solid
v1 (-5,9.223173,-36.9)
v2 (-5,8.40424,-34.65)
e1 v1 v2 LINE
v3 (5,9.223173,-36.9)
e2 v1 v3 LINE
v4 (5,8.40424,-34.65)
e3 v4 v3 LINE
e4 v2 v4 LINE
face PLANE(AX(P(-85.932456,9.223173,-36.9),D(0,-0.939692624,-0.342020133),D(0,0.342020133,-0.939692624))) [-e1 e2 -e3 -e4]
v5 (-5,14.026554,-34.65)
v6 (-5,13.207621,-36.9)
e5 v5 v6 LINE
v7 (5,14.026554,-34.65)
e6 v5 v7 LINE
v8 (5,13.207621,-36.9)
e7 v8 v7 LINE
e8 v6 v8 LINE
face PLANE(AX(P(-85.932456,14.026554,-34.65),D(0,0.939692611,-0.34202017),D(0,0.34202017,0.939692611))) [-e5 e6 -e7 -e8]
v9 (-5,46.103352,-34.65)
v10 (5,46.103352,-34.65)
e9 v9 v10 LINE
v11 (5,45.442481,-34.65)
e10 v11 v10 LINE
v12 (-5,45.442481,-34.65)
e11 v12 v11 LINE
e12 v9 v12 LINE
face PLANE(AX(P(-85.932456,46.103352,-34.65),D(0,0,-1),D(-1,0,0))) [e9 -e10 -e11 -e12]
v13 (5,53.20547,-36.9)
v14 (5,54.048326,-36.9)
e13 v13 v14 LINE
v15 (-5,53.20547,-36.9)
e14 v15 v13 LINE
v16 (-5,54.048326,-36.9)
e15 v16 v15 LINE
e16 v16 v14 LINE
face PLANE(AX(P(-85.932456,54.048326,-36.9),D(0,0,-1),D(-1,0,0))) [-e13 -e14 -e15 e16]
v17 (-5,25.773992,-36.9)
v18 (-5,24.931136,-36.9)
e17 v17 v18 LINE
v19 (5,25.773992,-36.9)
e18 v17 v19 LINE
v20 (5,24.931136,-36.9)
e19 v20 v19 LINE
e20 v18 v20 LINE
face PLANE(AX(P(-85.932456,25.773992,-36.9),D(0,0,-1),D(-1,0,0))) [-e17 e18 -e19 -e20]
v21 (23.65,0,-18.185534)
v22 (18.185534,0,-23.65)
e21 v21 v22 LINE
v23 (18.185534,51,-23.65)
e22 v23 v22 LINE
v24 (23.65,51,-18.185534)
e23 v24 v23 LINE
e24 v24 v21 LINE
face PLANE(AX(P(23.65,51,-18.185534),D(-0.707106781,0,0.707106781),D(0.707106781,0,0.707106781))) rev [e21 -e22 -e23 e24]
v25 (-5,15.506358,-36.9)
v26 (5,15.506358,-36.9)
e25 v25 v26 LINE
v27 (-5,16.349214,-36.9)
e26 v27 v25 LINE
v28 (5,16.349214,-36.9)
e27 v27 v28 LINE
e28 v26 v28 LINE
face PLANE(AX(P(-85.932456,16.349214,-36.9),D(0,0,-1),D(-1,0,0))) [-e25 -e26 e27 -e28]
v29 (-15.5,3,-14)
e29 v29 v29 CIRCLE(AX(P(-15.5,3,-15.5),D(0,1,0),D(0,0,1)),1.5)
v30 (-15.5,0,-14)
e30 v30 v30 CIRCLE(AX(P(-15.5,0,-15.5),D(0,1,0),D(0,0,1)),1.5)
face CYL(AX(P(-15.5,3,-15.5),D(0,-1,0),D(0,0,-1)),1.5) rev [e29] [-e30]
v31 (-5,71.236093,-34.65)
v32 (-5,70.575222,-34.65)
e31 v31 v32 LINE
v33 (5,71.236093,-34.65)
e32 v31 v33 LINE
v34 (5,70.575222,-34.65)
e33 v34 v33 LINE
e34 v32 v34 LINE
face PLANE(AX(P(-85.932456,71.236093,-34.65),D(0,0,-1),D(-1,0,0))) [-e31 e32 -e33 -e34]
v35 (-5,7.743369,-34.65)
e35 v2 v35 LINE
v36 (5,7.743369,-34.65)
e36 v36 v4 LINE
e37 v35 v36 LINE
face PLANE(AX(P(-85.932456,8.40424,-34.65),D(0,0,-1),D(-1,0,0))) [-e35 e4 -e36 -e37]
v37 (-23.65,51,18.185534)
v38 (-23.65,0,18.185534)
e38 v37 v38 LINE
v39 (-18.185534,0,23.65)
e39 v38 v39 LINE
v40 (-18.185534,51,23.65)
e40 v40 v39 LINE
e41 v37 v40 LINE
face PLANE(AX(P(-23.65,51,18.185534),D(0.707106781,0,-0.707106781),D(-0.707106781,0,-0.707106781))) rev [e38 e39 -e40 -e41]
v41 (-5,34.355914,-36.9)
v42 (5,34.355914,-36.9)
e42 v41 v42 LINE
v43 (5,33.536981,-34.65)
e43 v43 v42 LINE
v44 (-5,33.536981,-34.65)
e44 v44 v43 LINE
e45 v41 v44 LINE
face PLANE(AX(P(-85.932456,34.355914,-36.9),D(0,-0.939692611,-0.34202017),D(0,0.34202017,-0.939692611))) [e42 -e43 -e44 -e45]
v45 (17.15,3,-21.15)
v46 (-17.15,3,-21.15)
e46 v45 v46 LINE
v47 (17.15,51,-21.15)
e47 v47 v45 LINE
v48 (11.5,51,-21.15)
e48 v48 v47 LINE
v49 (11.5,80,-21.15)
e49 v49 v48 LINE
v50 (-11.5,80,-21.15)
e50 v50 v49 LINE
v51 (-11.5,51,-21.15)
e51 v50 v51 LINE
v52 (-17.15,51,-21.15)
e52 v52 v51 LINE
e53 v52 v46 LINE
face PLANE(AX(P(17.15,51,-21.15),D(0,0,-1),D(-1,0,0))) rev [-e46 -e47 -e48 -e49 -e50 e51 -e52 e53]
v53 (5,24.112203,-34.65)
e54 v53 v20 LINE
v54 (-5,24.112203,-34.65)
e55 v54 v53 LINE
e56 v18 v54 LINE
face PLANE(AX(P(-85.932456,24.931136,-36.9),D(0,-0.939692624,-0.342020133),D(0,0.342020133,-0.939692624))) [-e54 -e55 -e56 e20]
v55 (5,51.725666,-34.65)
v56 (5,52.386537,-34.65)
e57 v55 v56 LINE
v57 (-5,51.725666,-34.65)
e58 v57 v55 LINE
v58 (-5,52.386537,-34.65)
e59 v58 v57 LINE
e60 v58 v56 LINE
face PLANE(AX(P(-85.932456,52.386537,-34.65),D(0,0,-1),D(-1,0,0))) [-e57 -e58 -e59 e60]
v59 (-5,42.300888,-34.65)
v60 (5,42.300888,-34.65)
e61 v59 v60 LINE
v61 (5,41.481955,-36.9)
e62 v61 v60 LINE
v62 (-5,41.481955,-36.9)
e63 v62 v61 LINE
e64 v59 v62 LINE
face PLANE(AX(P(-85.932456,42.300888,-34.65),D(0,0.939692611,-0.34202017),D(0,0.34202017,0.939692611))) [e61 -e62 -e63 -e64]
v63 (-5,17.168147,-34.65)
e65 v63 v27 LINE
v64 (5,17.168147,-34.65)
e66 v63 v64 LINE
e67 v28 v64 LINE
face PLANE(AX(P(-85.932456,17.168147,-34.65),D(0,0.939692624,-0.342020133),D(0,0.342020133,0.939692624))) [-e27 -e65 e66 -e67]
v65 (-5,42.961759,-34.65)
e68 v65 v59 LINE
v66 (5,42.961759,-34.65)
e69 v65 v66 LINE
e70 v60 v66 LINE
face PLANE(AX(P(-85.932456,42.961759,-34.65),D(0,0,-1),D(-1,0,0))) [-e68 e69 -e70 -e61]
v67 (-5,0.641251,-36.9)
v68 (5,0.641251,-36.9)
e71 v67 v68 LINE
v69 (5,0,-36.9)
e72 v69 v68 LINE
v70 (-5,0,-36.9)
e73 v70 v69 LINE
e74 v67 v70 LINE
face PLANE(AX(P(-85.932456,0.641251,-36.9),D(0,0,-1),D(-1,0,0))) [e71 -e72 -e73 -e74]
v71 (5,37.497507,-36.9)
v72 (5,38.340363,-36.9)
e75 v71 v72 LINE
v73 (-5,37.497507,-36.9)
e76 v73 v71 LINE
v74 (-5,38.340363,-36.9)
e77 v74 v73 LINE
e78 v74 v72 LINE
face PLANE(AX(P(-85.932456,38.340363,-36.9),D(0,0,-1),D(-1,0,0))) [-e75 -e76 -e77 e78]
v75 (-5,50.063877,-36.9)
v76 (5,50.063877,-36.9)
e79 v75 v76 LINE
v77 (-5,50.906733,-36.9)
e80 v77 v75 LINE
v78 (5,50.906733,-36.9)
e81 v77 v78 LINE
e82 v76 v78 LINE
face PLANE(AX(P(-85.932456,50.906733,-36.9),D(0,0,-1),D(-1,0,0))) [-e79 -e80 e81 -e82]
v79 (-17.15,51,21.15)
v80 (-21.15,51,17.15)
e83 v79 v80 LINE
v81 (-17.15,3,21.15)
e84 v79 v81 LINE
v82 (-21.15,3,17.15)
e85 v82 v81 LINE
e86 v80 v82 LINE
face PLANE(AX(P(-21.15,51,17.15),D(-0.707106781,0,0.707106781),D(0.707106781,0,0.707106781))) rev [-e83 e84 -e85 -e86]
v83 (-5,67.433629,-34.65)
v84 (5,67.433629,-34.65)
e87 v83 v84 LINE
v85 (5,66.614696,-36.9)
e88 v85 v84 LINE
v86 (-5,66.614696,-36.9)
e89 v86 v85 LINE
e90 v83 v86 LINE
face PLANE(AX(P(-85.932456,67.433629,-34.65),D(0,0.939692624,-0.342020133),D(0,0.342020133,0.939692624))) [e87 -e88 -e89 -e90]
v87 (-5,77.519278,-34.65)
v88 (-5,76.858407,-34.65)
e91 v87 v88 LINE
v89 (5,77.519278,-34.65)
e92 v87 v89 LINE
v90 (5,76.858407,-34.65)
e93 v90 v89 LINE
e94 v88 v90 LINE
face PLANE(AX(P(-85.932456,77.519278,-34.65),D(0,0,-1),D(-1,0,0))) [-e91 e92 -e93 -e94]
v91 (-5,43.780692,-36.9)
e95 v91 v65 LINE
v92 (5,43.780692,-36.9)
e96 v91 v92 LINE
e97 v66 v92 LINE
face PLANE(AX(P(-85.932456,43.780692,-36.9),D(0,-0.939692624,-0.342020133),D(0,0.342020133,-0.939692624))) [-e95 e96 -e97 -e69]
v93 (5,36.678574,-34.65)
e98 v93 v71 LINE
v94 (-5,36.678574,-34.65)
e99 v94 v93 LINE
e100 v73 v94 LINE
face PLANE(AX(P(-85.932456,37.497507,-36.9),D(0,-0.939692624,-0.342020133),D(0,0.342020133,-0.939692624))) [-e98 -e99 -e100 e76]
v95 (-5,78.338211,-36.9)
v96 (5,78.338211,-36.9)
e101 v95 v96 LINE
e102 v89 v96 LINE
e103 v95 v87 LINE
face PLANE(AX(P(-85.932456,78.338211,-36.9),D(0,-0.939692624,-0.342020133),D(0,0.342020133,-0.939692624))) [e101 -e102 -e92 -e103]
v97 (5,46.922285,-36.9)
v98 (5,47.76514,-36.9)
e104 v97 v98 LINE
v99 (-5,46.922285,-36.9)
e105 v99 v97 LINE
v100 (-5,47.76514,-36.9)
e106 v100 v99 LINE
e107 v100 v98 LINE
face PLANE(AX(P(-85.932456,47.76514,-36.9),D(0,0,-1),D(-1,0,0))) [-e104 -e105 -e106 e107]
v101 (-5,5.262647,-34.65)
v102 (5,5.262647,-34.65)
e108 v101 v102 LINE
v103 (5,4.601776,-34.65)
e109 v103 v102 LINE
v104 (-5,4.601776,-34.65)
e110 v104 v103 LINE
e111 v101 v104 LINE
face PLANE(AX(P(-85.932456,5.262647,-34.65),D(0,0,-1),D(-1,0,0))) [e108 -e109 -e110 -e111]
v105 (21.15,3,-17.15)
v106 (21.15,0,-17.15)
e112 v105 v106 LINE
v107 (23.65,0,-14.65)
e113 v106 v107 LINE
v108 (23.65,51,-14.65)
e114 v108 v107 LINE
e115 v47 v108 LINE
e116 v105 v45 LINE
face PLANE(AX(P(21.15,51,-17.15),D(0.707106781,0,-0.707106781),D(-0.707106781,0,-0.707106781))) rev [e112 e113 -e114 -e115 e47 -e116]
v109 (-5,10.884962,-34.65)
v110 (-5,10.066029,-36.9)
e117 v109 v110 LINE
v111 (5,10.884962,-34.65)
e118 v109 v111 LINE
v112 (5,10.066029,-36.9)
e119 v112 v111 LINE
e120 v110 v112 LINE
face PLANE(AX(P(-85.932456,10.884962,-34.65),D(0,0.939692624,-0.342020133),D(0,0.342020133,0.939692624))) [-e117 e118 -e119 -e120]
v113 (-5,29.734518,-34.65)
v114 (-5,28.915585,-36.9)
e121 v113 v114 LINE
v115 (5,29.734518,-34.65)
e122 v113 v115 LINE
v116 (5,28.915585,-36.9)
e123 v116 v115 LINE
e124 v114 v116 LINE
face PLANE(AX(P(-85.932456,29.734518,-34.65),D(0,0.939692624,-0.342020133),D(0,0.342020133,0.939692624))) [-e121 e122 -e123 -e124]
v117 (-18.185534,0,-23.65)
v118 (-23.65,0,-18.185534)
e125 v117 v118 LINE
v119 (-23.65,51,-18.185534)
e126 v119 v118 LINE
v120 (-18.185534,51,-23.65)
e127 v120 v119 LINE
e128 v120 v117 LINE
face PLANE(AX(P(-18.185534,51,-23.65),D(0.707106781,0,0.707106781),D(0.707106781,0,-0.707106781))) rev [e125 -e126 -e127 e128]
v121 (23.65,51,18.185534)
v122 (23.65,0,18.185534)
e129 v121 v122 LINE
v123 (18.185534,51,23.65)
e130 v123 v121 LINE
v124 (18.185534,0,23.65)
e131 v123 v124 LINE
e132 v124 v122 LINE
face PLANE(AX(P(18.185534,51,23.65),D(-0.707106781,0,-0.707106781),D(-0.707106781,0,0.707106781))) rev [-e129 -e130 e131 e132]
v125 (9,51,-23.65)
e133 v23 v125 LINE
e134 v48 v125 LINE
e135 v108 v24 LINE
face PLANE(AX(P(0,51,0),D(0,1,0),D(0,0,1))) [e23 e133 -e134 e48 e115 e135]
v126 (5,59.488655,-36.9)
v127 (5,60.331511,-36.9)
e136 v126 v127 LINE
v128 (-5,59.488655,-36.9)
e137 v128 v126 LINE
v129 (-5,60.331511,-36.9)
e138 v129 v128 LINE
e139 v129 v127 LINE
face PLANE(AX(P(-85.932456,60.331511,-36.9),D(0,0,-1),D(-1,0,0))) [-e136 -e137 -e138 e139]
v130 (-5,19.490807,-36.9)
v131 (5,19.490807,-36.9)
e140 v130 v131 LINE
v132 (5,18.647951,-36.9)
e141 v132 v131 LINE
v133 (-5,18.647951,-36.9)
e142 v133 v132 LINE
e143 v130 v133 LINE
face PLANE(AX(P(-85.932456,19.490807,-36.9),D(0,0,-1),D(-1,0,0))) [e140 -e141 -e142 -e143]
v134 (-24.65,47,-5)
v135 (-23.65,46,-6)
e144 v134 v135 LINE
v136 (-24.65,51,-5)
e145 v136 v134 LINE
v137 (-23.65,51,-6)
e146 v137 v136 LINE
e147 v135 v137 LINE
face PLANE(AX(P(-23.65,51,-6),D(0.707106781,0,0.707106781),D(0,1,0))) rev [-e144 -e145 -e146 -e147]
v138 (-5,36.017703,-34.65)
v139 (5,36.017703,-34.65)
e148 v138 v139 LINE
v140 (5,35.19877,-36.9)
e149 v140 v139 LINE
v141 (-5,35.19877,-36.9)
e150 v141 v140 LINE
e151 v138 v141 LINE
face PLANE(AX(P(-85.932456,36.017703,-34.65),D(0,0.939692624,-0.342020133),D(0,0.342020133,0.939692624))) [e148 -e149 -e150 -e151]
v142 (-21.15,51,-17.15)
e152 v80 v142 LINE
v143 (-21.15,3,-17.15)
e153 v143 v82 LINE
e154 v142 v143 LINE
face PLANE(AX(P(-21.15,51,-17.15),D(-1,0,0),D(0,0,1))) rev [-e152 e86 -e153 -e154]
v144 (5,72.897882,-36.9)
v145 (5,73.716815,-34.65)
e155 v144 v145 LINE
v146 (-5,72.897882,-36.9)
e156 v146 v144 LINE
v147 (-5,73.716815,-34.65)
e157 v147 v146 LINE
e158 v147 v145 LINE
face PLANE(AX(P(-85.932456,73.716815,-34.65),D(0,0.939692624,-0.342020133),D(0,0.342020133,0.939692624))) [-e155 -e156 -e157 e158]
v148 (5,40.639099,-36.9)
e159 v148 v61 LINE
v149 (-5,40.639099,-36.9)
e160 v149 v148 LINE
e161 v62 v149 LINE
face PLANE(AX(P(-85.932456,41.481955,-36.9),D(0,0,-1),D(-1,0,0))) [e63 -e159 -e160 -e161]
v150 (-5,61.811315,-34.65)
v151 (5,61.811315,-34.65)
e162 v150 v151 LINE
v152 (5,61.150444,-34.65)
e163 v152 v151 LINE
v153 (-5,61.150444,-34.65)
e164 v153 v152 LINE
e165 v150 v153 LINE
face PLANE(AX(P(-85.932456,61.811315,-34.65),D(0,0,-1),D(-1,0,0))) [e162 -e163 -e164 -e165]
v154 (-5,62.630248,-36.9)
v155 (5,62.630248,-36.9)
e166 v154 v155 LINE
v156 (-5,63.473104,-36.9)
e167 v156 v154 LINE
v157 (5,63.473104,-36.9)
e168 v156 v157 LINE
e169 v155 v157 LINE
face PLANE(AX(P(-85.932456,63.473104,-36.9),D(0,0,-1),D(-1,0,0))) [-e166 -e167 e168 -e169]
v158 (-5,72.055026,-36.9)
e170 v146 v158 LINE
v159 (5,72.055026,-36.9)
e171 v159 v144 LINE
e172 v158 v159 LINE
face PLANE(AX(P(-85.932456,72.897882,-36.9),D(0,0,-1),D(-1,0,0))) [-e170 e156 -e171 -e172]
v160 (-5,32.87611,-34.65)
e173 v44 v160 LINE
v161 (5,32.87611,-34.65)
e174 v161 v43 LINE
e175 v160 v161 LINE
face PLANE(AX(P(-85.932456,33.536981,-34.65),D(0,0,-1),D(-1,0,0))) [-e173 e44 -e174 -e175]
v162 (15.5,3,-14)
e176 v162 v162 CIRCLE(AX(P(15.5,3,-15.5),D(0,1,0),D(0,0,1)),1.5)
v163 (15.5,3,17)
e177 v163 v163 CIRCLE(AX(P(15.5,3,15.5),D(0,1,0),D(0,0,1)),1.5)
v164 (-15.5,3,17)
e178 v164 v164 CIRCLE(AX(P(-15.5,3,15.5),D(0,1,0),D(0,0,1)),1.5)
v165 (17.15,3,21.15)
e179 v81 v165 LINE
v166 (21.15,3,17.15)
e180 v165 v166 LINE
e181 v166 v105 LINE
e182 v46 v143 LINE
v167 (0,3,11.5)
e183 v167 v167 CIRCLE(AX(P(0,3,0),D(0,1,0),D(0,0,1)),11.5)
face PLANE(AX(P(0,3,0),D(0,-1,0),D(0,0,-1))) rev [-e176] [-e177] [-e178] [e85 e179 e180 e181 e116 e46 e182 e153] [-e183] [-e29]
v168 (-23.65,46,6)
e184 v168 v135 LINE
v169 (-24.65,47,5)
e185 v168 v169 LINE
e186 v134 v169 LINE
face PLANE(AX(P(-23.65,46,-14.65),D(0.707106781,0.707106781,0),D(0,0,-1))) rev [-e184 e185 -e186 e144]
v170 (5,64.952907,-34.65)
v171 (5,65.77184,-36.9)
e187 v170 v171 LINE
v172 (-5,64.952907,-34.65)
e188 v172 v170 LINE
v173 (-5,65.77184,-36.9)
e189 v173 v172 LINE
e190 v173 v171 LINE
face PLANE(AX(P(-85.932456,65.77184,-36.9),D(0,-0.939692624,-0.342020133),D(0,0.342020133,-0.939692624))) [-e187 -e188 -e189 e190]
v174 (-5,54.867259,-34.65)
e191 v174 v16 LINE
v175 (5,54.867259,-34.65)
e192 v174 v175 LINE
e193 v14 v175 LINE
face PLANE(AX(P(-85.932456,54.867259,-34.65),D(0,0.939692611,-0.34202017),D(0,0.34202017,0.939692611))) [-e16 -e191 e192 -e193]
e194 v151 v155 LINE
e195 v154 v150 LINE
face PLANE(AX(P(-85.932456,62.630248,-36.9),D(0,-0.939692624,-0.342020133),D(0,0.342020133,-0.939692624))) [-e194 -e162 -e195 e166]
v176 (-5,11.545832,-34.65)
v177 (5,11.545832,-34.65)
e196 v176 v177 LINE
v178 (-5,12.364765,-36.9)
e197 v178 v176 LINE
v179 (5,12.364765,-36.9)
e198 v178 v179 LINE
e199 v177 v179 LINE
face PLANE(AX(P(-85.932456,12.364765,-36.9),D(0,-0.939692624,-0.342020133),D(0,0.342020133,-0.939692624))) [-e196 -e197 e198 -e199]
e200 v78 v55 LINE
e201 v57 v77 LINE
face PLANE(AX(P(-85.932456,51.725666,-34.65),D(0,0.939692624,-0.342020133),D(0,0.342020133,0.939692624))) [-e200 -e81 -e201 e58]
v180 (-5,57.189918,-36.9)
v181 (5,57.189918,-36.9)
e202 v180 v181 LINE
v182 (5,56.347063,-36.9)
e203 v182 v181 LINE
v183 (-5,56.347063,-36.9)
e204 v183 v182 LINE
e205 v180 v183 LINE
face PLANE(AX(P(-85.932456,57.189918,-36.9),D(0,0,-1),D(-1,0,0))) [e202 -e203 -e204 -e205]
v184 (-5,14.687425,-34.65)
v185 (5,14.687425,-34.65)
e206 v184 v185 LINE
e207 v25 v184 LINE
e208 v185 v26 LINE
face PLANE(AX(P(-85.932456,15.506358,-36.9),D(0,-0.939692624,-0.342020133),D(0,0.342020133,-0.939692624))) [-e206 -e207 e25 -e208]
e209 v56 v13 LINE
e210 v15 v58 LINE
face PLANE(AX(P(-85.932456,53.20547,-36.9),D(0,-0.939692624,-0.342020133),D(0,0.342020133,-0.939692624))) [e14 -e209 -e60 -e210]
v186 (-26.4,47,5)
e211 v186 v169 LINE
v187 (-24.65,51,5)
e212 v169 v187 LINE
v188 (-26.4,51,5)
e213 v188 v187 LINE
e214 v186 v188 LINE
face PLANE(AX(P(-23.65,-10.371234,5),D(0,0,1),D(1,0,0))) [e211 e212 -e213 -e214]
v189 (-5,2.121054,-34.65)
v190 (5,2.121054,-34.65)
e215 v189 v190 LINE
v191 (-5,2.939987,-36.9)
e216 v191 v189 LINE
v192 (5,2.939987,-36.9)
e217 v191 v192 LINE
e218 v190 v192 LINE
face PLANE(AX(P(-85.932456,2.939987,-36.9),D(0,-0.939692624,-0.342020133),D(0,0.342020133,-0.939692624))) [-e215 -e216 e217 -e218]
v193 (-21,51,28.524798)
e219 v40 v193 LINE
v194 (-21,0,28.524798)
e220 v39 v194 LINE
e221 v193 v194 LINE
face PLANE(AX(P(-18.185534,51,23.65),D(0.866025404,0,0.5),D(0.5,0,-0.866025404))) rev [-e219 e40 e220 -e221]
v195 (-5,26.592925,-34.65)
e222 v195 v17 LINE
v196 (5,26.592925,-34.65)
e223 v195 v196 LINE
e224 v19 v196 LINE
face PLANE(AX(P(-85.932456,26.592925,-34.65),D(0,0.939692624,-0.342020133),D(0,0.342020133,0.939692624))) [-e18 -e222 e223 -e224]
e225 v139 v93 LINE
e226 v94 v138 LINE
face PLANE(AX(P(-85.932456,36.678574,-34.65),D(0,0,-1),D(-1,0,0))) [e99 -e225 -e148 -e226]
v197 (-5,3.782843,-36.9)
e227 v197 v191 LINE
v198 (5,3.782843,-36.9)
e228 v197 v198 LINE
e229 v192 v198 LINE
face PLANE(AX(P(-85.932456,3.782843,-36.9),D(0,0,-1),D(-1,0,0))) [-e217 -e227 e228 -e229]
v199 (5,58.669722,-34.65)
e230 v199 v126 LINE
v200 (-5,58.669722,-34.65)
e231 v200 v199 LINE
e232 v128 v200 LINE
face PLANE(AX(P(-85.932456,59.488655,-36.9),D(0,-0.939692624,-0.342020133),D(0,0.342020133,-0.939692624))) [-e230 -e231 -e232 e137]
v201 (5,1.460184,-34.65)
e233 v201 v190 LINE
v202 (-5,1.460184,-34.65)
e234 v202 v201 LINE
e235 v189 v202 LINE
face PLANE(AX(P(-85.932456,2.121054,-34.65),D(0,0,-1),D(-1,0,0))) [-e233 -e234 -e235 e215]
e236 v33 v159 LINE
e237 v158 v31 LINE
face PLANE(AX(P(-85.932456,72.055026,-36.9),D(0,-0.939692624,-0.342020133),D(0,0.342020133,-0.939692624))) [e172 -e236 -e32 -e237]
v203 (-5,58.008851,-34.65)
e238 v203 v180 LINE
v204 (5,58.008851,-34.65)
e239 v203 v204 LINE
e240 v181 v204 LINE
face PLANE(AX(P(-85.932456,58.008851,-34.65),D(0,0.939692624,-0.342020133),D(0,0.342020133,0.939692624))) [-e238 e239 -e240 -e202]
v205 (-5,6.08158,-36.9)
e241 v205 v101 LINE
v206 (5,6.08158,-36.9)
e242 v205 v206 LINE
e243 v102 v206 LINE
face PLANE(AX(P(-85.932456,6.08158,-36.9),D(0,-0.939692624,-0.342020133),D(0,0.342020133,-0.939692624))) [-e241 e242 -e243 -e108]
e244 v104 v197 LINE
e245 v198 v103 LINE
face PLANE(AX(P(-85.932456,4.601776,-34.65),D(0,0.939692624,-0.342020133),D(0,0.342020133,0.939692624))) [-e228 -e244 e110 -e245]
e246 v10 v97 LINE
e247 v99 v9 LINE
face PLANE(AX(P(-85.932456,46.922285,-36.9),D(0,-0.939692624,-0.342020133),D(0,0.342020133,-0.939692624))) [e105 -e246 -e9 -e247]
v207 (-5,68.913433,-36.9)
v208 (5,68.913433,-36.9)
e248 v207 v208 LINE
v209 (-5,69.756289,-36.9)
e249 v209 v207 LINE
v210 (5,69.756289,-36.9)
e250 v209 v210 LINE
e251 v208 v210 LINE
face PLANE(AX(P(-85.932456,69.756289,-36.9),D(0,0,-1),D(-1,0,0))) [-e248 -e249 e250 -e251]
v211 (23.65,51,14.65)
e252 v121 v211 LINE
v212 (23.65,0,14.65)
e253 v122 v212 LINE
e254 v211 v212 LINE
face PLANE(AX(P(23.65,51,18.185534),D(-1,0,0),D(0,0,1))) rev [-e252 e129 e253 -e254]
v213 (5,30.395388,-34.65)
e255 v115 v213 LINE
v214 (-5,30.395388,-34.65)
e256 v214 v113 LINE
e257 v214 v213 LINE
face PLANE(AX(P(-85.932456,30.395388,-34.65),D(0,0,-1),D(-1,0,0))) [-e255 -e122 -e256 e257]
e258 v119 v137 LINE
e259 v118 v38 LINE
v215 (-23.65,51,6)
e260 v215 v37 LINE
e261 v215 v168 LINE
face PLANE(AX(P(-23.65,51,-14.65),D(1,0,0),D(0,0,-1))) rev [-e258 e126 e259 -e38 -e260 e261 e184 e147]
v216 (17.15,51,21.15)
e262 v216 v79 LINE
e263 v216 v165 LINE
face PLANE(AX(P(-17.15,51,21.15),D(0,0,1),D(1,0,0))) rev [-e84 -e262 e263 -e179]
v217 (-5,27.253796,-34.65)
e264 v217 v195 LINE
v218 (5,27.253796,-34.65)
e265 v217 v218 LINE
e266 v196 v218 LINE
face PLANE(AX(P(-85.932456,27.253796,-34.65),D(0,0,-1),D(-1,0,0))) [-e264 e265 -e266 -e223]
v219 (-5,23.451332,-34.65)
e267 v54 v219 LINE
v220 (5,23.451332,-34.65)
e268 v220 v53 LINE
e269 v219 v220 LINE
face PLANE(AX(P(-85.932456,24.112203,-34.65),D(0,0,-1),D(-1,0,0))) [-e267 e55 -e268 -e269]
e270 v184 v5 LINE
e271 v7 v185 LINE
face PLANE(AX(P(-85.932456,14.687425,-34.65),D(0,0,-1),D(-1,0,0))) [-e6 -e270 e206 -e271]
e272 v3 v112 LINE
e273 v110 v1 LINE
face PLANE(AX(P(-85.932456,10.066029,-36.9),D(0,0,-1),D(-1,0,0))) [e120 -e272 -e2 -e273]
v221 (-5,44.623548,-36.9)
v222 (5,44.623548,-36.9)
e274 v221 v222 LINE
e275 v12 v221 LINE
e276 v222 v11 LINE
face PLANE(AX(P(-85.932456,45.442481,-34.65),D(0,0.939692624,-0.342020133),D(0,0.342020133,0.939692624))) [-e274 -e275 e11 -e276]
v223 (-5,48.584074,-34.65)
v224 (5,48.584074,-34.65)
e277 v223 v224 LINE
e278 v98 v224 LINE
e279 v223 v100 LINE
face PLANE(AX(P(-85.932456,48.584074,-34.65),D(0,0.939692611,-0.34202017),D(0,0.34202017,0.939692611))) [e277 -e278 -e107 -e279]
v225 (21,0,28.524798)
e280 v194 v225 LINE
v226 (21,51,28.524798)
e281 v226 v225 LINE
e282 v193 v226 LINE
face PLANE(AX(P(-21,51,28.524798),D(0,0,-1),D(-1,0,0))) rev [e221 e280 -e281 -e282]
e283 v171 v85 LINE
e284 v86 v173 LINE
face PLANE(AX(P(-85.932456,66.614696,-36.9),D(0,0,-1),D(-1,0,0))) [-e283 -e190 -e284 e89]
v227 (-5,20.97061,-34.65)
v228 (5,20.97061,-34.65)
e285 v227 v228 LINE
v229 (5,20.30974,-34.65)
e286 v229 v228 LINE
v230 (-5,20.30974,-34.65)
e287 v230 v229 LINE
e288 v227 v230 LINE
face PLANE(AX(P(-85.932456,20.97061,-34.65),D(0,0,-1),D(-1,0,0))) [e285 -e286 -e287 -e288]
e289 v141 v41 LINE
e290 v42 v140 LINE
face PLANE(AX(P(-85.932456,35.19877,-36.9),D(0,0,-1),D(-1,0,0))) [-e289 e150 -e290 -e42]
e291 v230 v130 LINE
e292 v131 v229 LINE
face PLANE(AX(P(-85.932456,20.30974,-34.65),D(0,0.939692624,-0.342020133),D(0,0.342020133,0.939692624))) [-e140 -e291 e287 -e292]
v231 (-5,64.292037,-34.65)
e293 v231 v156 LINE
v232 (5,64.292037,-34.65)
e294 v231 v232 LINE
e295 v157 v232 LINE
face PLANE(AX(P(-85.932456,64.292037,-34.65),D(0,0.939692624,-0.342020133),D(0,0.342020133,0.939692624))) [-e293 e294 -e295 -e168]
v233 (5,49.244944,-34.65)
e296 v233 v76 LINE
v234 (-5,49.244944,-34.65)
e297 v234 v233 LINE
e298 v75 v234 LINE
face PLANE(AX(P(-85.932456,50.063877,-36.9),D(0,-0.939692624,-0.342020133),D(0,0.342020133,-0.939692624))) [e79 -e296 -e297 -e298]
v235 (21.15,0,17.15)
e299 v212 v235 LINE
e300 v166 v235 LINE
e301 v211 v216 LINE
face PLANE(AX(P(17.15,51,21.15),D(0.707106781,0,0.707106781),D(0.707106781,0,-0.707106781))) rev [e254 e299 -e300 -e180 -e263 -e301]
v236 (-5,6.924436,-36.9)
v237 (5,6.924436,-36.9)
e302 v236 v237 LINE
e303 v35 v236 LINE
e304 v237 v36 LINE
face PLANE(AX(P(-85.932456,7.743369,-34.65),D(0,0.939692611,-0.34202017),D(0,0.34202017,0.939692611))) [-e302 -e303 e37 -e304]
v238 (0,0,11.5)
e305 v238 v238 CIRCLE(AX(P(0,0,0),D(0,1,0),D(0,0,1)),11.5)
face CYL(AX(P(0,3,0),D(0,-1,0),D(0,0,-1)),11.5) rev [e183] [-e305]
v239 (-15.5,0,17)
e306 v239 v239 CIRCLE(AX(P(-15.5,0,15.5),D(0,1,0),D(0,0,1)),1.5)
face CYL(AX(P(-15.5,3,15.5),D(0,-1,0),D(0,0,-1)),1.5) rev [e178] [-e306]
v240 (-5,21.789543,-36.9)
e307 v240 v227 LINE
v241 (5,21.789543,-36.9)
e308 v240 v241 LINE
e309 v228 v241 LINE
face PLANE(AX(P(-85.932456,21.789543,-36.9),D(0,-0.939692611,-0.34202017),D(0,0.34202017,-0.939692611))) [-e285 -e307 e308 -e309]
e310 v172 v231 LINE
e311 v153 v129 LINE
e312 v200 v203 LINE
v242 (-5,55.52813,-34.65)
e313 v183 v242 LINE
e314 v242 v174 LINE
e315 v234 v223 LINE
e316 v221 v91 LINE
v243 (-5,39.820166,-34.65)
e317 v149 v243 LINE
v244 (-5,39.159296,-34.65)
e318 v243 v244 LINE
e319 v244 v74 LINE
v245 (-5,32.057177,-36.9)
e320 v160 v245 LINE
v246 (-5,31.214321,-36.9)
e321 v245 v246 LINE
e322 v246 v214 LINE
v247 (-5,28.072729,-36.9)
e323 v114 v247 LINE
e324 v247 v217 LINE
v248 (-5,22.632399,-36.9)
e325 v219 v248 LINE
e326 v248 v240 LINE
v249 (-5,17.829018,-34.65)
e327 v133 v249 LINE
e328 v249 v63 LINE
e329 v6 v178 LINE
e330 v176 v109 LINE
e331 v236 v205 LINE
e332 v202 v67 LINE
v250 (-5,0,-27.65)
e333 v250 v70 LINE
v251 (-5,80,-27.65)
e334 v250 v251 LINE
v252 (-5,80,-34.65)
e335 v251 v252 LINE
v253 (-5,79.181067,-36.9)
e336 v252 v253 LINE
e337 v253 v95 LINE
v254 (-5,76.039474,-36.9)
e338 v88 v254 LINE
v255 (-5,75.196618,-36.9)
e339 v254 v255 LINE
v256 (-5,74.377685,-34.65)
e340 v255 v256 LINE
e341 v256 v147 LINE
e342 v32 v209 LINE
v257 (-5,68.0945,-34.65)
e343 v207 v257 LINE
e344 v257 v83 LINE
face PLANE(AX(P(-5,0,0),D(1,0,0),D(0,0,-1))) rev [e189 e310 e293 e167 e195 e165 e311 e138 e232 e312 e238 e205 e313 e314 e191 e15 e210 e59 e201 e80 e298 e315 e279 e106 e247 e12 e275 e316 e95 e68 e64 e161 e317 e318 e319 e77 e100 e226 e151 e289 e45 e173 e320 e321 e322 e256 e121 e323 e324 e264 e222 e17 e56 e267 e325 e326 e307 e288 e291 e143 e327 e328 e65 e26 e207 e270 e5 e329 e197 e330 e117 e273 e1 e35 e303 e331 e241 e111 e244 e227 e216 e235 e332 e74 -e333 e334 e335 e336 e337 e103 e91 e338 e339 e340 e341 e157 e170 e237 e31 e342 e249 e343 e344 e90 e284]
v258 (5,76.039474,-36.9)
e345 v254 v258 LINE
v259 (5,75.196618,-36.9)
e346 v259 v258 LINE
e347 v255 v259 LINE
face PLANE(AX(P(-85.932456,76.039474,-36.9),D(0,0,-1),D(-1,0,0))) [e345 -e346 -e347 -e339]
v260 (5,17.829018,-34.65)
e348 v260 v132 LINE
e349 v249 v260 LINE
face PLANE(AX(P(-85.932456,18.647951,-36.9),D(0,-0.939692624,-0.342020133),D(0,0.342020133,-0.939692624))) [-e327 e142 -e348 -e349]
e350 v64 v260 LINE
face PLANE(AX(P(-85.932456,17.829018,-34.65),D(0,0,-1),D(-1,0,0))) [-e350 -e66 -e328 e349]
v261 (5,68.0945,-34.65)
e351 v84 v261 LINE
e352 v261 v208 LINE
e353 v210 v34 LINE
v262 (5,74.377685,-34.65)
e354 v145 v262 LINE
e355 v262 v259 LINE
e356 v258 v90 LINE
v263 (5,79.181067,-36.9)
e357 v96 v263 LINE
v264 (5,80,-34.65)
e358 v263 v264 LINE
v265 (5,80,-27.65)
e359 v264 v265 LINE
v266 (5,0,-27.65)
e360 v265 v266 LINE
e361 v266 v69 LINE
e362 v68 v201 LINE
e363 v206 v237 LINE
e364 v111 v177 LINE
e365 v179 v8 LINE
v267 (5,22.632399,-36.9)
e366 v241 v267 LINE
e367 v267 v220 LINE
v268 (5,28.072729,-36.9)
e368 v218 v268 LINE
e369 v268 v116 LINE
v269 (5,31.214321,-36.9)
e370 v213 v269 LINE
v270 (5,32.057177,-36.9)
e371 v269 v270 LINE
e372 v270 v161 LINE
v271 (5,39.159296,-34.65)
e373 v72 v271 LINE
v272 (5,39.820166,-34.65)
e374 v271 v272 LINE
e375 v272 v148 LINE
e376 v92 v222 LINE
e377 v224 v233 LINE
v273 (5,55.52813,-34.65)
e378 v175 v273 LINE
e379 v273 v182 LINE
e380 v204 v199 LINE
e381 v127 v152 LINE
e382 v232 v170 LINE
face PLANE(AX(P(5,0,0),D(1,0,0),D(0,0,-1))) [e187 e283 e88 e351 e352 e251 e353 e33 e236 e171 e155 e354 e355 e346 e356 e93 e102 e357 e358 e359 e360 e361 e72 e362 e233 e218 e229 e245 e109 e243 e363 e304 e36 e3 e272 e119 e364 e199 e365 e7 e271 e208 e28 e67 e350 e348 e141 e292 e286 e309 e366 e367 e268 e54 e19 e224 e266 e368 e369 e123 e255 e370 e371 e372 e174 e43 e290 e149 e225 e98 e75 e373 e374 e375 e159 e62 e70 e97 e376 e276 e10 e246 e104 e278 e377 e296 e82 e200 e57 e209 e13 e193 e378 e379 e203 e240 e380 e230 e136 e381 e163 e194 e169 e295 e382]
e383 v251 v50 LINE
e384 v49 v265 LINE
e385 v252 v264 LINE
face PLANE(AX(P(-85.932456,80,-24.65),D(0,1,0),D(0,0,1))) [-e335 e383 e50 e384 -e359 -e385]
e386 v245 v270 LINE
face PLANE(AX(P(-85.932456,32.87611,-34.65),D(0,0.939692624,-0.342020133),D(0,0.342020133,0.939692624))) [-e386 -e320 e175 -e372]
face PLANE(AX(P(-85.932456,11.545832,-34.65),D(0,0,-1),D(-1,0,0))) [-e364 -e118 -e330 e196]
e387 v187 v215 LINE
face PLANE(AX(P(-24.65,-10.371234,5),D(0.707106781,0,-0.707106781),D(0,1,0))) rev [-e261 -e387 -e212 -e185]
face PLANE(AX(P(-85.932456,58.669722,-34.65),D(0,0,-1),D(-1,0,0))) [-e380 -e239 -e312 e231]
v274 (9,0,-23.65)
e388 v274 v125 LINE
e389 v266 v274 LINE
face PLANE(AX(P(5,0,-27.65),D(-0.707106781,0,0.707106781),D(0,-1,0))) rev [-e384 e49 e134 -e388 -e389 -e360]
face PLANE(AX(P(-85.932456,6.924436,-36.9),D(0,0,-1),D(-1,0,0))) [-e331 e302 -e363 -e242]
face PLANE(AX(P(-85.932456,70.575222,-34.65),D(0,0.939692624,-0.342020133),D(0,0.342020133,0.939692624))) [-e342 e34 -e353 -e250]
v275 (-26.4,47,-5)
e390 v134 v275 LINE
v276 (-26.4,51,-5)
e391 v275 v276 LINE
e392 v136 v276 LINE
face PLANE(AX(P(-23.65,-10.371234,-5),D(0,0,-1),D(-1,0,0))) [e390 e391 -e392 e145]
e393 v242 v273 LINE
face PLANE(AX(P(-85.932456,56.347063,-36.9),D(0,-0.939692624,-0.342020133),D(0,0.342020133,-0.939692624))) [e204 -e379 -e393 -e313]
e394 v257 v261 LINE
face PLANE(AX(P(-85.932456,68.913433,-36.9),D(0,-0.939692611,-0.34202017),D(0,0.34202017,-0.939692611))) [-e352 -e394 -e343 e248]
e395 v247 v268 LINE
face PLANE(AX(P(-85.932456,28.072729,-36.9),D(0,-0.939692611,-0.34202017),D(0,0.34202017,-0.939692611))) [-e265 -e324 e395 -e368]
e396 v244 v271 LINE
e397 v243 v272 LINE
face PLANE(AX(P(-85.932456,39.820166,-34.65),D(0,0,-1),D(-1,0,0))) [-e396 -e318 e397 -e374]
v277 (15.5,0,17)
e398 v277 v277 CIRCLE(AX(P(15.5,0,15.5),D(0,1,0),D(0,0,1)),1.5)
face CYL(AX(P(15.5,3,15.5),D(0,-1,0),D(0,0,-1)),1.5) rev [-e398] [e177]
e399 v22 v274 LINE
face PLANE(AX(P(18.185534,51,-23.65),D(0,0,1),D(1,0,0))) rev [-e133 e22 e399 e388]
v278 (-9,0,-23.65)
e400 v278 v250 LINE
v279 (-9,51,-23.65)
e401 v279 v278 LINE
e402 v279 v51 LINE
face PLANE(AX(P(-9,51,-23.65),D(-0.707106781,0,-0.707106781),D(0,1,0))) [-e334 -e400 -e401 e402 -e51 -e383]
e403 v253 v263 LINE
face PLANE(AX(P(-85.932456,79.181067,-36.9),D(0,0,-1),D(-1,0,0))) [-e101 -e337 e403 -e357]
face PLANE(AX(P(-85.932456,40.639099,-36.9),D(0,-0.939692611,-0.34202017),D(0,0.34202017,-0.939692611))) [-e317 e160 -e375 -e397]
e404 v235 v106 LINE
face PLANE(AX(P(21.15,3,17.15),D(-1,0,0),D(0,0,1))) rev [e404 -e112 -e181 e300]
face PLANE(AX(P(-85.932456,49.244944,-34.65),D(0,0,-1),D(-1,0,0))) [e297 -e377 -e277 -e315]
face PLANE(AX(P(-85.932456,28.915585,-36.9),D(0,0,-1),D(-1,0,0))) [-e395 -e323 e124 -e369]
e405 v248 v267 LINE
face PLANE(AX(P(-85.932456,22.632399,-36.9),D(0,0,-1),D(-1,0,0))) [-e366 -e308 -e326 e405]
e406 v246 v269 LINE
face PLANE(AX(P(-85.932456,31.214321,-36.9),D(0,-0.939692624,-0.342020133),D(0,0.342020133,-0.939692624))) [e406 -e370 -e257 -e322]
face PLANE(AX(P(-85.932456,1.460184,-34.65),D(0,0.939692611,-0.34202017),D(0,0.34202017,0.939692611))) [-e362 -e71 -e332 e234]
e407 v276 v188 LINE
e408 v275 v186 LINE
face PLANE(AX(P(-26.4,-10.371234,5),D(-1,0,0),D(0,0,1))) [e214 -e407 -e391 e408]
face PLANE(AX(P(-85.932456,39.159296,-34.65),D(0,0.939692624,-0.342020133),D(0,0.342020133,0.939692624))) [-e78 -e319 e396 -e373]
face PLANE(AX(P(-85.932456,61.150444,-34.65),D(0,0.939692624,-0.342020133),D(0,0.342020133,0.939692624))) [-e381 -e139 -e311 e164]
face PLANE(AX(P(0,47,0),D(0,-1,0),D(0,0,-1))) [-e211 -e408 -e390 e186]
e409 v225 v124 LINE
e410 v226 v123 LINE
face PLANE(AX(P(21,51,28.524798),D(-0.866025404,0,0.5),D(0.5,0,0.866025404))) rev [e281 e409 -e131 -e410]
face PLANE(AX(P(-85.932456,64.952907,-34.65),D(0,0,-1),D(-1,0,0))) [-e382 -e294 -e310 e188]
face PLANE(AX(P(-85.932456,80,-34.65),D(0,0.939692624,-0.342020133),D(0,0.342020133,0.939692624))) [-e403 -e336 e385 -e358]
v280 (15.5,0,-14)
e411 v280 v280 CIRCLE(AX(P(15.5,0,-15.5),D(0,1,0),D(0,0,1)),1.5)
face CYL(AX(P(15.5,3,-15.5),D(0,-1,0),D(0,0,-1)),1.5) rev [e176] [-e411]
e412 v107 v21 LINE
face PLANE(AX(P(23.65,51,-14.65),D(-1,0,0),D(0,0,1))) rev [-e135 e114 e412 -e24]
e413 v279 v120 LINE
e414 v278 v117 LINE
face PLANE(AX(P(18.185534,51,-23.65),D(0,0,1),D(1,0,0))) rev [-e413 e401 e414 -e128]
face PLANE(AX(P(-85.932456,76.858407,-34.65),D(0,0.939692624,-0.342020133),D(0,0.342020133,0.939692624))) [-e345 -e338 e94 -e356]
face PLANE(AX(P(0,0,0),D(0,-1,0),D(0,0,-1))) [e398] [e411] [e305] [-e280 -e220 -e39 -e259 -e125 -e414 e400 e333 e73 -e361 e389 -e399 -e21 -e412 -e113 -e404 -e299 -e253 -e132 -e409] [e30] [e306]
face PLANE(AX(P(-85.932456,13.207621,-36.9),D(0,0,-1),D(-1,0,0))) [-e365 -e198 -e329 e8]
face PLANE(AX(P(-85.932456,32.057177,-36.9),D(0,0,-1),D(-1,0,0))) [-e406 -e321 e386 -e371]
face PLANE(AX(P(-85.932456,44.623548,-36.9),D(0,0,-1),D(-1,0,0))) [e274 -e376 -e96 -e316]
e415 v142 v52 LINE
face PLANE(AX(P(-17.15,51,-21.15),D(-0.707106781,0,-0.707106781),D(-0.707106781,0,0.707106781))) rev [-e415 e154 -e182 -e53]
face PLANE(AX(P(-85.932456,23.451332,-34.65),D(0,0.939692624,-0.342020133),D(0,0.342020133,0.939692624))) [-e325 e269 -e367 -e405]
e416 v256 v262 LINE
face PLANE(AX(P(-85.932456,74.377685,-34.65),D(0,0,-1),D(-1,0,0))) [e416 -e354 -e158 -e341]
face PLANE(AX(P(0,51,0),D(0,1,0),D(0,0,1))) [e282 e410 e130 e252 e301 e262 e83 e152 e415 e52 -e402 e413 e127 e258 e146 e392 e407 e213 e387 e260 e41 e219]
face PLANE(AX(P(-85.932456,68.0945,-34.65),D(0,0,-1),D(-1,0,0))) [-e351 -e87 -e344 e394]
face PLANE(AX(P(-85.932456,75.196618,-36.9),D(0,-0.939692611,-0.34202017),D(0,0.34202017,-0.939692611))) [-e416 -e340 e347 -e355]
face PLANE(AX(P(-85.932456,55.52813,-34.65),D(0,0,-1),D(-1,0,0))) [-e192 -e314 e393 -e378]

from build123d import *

# Parameters (mm, degrees)
SKETCH1_R           = 1.5
SKETCH1_R_2         = 11.5
BOSS_EXTRUDE1_DEPTH = 3
BOSS_EXTRUDE2_DEPTH = 51
BOSS_EXTRUDE3_DEPTH = 51
SKETCH11_W          = 1
SKETCH11_H          = 51
BOSS_EXTRUDE4_DEPTH = 5
BOSS_EXTRUDE6_DEPTH = 10
CHAMFER1_SIZE       = 4
BOSS_EXTRUDE7_DEPTH = 29
SKETCH16_W          = 2.75
SKETCH16_H          = 10
BOSS_EXTRUDE8_DEPTH = 4
CHAMFER2_SIZE       = 1
CHAMFER3_SIZE       = 1


with BuildPart() as part:
    # Sketch1 → Boss-Extrude1 (new body)
    with BuildSketch(Plane(origin=(0, 0, 0), x_dir=(1, 0, 0), z_dir=(0, 1, 0))):
        Polygon((-21.15, 17.15), (-17.15, 21.15), (17.15, 21.15), (21.15, 17.15), (21.15, -17.15), (17.15, -21.15), (-17.15, -21.15), (-21.15, -17.15), align=None)
        with Locations(Location((-15.5, 15.5, 0), (0, 0, 270))):
            Circle(SKETCH1_R, mode=Mode.SUBTRACT)
        with Locations(Location((15.5, 15.5, 0), (0, 0, 270))):
            Circle(SKETCH1_R, mode=Mode.SUBTRACT)
        with Locations(Location((15.5, -15.5, 0), (0, 0, 270))):
            Circle(SKETCH1_R, mode=Mode.SUBTRACT)
        with Locations(Location((-15.5, -15.5, 0), (0, 0, 270))):
            Circle(SKETCH1_R, mode=Mode.SUBTRACT)
        with Locations(Location((0, 0, 0), (0, 0, 270))):
            Circle(SKETCH1_R_2, mode=Mode.SUBTRACT)
    extrude(amount=BOSS_EXTRUDE1_DEPTH)

    # Sketch5 → Boss-Extrude2 (add)
    with BuildSketch(Plane(origin=(0, 0, 0), x_dir=(1, 0, 0), z_dir=(0, 1, 0))):
        Polygon((21.15, -17.15), (23.65, -14.65), (23.65, -18.185533906), (18.185533906, -23.65), (-18.185533906, -23.65), (-23.65, -18.185533906), (-23.65, 14.65), (-23.65, 18.185533906), (-18.185533906, 23.65), (18.185533906, 23.65), (23.65, 18.185533906), (23.65, 14.65), (21.15, 17.15), (17.15, 21.15), (-17.15, 21.15), (-21.15, 17.15), (-21.15, -17.15), (-17.15, -21.15), (17.15, -21.15), align=None)
    extrude(amount=BOSS_EXTRUDE2_DEPTH)

    # Sketch9 → Boss-Extrude3 (add)
    with BuildSketch(Plane(origin=(0, 0, 0), x_dir=(1, 0, 0), z_dir=(0, 1, 0))):
        Polygon((-18.185533906, -23.65), (-21, -28.524798271), (21, -28.524798271), (18.185533906, -23.65), align=None)
    extrude(amount=BOSS_EXTRUDE3_DEPTH)

    # Sketch11 → Boss-Extrude4 (add, symmetric)
    with BuildSketch(Plane(origin=(0, 0, 0), x_dir=(0, 0, -1), z_dir=(1, 0, 0))):
        with Locations((24.15, 25.5)):
            Rectangle(SKETCH11_W, SKETCH11_H)
    extrude(amount=BOSS_EXTRUDE4_DEPTH, both=True)

    # Sketch13 → Boss-Extrude6 (add)
    with BuildSketch(Plane(origin=(5, 0, 0), x_dir=(0, 0, -1), z_dir=(1, 0, 0))):
        Polygon((24.65, 80), (34.65, 80), (36.9, 79.181067), (36.9, 78.3382111), (34.65, 77.5192781), (34.65, 76.8584073), (36.9, 76.0394743), (36.9, 75.1966185), (34.65, 74.3776854), (34.65, 73.7168147), (36.9, 72.8978817), (36.9, 72.0550258), (34.65, 71.2360928), (34.65, 70.575222), (36.9, 69.756289), (36.9, 68.9134332), (34.65, 68.0945001), (34.65, 67.4336294), (36.9, 66.6146964), (36.9, 65.7718405), (34.65, 64.9529075), (34.65, 64.2920367), (36.9, 63.4731037), (36.9, 62.6302478), (34.65, 61.8113148), (34.65, 61.1504441), (36.9, 60.3315111), (36.9, 59.4886552), (34.65, 58.6697222), (34.65, 58.0088514), (36.9, 57.1899184), (36.9, 56.3470625), (34.65, 55.5281295), (34.65, 54.8672588), (36.9, 54.0483257), (36.9, 53.2054699), (34.65, 52.3865369), (34.65, 51.7256661), (36.9, 50.9067331), (36.9, 50.0638772), (34.65, 49.2449442), (34.65, 48.5840735), (36.9, 47.7651404), (36.9, 46.9222846), (34.65, 46.1033516), (34.65, 45.4424808), (36.9, 44.6235478), (36.9, 43.7806919), (34.65, 42.9617589), (34.65, 42.3008882), (36.9, 41.4819551), (36.9, 40.6390993), (34.65, 39.8201662), (34.65, 39.1592955), (36.9, 38.3403625), (36.9, 37.4975066), (34.65, 36.6785736), (34.65, 36.0177028), (36.9, 35.1987698), (36.9, 34.355914), (34.65, 33.5369809), (34.65, 32.8761102), (36.9, 32.0571772), (36.9, 31.2143213), (34.65, 30.3953883), (34.65, 29.7345175), (36.9, 28.9155845), (36.9, 28.0727287), (34.65, 27.2537956), (34.65, 26.5929249), (36.9, 25.7739919), (36.9, 24.931136), (34.65, 24.112203), (34.65, 23.4513322), (36.9, 22.6323992), (36.9, 21.7895434), (34.65, 20.9706103), (34.65, 20.3097396), (36.9, 19.4908066), (36.9, 18.6479507), (34.65, 17.8290177), (34.65, 17.1681469), (36.9, 16.3492139), (36.9, 15.506358), (34.65, 14.687425), (34.65, 14.0265543), (36.9, 13.2076212), (36.9, 12.3647654), (34.65, 11.5458324), (34.65, 10.8849616), (36.9, 10.0660286), (36.9, 9.2231727), (34.65, 8.4042397), (34.65, 7.743369), (36.9, 6.9244359), (36.9, 6.0815801), (34.65, 5.2626471), (34.65, 4.6017763), (36.9, 3.7828433), (36.9, 2.9399874), (34.65, 2.1210544), (34.65, 1.4601837), (36.9, 0.6412506), (36.9, 0), (24.65, 0), align=None)
    extrude(amount=-BOSS_EXTRUDE6_DEPTH)

    # Chamfer1
    chamfer1_edges = [part.edges().sort_by_distance(p)[0] for p in [
        (5, 25.5, -23.65),
    ]]
    chamfer(chamfer1_edges, length=CHAMFER1_SIZE)
    chamfer1_2_edges = [part.edges().sort_by_distance(p)[0] for p in [
        (-5, 25.5, -23.65),
    ]]
    chamfer(chamfer1_2_edges, length=CHAMFER1_SIZE)

    # Sketch15 → Boss-Extrude7 (add)
    with BuildSketch(Plane(origin=(0, 51, 0), x_dir=(1, 0, 0), z_dir=(0, 1, 0))):
        Polygon((-8, 24.65), (-11.5, 21.15), (11.5, 21.15), (8, 24.65), align=None)
    extrude(amount=BOSS_EXTRUDE7_DEPTH)

    # Sketch16 → Boss-Extrude8 (add)
    with BuildSketch(Plane(origin=(0, 51, 0), x_dir=(1, 0, 0), z_dir=(0, 1, 0))):
        with Locations((-25.025, 0)):
            Rectangle(SKETCH16_W, SKETCH16_H)
    extrude(amount=-BOSS_EXTRUDE8_DEPTH)

    # Chamfer2
    chamfer2_edges = [part.edges().sort_by_distance(p)[0] for p in [
        (-23.65, 47, 0),
    ]]
    chamfer(chamfer2_edges, length=CHAMFER2_SIZE)

    # Chamfer3
    chamfer3_edges = [part.edges().sort_by_distance(p)[0] for p in [
        (-23.65, 48.5, -5),
        (-23.65, 48.5, 5),
    ]]
    chamfer(chamfer3_edges, length=CHAMFER3_SIZE)


solid = part.part
